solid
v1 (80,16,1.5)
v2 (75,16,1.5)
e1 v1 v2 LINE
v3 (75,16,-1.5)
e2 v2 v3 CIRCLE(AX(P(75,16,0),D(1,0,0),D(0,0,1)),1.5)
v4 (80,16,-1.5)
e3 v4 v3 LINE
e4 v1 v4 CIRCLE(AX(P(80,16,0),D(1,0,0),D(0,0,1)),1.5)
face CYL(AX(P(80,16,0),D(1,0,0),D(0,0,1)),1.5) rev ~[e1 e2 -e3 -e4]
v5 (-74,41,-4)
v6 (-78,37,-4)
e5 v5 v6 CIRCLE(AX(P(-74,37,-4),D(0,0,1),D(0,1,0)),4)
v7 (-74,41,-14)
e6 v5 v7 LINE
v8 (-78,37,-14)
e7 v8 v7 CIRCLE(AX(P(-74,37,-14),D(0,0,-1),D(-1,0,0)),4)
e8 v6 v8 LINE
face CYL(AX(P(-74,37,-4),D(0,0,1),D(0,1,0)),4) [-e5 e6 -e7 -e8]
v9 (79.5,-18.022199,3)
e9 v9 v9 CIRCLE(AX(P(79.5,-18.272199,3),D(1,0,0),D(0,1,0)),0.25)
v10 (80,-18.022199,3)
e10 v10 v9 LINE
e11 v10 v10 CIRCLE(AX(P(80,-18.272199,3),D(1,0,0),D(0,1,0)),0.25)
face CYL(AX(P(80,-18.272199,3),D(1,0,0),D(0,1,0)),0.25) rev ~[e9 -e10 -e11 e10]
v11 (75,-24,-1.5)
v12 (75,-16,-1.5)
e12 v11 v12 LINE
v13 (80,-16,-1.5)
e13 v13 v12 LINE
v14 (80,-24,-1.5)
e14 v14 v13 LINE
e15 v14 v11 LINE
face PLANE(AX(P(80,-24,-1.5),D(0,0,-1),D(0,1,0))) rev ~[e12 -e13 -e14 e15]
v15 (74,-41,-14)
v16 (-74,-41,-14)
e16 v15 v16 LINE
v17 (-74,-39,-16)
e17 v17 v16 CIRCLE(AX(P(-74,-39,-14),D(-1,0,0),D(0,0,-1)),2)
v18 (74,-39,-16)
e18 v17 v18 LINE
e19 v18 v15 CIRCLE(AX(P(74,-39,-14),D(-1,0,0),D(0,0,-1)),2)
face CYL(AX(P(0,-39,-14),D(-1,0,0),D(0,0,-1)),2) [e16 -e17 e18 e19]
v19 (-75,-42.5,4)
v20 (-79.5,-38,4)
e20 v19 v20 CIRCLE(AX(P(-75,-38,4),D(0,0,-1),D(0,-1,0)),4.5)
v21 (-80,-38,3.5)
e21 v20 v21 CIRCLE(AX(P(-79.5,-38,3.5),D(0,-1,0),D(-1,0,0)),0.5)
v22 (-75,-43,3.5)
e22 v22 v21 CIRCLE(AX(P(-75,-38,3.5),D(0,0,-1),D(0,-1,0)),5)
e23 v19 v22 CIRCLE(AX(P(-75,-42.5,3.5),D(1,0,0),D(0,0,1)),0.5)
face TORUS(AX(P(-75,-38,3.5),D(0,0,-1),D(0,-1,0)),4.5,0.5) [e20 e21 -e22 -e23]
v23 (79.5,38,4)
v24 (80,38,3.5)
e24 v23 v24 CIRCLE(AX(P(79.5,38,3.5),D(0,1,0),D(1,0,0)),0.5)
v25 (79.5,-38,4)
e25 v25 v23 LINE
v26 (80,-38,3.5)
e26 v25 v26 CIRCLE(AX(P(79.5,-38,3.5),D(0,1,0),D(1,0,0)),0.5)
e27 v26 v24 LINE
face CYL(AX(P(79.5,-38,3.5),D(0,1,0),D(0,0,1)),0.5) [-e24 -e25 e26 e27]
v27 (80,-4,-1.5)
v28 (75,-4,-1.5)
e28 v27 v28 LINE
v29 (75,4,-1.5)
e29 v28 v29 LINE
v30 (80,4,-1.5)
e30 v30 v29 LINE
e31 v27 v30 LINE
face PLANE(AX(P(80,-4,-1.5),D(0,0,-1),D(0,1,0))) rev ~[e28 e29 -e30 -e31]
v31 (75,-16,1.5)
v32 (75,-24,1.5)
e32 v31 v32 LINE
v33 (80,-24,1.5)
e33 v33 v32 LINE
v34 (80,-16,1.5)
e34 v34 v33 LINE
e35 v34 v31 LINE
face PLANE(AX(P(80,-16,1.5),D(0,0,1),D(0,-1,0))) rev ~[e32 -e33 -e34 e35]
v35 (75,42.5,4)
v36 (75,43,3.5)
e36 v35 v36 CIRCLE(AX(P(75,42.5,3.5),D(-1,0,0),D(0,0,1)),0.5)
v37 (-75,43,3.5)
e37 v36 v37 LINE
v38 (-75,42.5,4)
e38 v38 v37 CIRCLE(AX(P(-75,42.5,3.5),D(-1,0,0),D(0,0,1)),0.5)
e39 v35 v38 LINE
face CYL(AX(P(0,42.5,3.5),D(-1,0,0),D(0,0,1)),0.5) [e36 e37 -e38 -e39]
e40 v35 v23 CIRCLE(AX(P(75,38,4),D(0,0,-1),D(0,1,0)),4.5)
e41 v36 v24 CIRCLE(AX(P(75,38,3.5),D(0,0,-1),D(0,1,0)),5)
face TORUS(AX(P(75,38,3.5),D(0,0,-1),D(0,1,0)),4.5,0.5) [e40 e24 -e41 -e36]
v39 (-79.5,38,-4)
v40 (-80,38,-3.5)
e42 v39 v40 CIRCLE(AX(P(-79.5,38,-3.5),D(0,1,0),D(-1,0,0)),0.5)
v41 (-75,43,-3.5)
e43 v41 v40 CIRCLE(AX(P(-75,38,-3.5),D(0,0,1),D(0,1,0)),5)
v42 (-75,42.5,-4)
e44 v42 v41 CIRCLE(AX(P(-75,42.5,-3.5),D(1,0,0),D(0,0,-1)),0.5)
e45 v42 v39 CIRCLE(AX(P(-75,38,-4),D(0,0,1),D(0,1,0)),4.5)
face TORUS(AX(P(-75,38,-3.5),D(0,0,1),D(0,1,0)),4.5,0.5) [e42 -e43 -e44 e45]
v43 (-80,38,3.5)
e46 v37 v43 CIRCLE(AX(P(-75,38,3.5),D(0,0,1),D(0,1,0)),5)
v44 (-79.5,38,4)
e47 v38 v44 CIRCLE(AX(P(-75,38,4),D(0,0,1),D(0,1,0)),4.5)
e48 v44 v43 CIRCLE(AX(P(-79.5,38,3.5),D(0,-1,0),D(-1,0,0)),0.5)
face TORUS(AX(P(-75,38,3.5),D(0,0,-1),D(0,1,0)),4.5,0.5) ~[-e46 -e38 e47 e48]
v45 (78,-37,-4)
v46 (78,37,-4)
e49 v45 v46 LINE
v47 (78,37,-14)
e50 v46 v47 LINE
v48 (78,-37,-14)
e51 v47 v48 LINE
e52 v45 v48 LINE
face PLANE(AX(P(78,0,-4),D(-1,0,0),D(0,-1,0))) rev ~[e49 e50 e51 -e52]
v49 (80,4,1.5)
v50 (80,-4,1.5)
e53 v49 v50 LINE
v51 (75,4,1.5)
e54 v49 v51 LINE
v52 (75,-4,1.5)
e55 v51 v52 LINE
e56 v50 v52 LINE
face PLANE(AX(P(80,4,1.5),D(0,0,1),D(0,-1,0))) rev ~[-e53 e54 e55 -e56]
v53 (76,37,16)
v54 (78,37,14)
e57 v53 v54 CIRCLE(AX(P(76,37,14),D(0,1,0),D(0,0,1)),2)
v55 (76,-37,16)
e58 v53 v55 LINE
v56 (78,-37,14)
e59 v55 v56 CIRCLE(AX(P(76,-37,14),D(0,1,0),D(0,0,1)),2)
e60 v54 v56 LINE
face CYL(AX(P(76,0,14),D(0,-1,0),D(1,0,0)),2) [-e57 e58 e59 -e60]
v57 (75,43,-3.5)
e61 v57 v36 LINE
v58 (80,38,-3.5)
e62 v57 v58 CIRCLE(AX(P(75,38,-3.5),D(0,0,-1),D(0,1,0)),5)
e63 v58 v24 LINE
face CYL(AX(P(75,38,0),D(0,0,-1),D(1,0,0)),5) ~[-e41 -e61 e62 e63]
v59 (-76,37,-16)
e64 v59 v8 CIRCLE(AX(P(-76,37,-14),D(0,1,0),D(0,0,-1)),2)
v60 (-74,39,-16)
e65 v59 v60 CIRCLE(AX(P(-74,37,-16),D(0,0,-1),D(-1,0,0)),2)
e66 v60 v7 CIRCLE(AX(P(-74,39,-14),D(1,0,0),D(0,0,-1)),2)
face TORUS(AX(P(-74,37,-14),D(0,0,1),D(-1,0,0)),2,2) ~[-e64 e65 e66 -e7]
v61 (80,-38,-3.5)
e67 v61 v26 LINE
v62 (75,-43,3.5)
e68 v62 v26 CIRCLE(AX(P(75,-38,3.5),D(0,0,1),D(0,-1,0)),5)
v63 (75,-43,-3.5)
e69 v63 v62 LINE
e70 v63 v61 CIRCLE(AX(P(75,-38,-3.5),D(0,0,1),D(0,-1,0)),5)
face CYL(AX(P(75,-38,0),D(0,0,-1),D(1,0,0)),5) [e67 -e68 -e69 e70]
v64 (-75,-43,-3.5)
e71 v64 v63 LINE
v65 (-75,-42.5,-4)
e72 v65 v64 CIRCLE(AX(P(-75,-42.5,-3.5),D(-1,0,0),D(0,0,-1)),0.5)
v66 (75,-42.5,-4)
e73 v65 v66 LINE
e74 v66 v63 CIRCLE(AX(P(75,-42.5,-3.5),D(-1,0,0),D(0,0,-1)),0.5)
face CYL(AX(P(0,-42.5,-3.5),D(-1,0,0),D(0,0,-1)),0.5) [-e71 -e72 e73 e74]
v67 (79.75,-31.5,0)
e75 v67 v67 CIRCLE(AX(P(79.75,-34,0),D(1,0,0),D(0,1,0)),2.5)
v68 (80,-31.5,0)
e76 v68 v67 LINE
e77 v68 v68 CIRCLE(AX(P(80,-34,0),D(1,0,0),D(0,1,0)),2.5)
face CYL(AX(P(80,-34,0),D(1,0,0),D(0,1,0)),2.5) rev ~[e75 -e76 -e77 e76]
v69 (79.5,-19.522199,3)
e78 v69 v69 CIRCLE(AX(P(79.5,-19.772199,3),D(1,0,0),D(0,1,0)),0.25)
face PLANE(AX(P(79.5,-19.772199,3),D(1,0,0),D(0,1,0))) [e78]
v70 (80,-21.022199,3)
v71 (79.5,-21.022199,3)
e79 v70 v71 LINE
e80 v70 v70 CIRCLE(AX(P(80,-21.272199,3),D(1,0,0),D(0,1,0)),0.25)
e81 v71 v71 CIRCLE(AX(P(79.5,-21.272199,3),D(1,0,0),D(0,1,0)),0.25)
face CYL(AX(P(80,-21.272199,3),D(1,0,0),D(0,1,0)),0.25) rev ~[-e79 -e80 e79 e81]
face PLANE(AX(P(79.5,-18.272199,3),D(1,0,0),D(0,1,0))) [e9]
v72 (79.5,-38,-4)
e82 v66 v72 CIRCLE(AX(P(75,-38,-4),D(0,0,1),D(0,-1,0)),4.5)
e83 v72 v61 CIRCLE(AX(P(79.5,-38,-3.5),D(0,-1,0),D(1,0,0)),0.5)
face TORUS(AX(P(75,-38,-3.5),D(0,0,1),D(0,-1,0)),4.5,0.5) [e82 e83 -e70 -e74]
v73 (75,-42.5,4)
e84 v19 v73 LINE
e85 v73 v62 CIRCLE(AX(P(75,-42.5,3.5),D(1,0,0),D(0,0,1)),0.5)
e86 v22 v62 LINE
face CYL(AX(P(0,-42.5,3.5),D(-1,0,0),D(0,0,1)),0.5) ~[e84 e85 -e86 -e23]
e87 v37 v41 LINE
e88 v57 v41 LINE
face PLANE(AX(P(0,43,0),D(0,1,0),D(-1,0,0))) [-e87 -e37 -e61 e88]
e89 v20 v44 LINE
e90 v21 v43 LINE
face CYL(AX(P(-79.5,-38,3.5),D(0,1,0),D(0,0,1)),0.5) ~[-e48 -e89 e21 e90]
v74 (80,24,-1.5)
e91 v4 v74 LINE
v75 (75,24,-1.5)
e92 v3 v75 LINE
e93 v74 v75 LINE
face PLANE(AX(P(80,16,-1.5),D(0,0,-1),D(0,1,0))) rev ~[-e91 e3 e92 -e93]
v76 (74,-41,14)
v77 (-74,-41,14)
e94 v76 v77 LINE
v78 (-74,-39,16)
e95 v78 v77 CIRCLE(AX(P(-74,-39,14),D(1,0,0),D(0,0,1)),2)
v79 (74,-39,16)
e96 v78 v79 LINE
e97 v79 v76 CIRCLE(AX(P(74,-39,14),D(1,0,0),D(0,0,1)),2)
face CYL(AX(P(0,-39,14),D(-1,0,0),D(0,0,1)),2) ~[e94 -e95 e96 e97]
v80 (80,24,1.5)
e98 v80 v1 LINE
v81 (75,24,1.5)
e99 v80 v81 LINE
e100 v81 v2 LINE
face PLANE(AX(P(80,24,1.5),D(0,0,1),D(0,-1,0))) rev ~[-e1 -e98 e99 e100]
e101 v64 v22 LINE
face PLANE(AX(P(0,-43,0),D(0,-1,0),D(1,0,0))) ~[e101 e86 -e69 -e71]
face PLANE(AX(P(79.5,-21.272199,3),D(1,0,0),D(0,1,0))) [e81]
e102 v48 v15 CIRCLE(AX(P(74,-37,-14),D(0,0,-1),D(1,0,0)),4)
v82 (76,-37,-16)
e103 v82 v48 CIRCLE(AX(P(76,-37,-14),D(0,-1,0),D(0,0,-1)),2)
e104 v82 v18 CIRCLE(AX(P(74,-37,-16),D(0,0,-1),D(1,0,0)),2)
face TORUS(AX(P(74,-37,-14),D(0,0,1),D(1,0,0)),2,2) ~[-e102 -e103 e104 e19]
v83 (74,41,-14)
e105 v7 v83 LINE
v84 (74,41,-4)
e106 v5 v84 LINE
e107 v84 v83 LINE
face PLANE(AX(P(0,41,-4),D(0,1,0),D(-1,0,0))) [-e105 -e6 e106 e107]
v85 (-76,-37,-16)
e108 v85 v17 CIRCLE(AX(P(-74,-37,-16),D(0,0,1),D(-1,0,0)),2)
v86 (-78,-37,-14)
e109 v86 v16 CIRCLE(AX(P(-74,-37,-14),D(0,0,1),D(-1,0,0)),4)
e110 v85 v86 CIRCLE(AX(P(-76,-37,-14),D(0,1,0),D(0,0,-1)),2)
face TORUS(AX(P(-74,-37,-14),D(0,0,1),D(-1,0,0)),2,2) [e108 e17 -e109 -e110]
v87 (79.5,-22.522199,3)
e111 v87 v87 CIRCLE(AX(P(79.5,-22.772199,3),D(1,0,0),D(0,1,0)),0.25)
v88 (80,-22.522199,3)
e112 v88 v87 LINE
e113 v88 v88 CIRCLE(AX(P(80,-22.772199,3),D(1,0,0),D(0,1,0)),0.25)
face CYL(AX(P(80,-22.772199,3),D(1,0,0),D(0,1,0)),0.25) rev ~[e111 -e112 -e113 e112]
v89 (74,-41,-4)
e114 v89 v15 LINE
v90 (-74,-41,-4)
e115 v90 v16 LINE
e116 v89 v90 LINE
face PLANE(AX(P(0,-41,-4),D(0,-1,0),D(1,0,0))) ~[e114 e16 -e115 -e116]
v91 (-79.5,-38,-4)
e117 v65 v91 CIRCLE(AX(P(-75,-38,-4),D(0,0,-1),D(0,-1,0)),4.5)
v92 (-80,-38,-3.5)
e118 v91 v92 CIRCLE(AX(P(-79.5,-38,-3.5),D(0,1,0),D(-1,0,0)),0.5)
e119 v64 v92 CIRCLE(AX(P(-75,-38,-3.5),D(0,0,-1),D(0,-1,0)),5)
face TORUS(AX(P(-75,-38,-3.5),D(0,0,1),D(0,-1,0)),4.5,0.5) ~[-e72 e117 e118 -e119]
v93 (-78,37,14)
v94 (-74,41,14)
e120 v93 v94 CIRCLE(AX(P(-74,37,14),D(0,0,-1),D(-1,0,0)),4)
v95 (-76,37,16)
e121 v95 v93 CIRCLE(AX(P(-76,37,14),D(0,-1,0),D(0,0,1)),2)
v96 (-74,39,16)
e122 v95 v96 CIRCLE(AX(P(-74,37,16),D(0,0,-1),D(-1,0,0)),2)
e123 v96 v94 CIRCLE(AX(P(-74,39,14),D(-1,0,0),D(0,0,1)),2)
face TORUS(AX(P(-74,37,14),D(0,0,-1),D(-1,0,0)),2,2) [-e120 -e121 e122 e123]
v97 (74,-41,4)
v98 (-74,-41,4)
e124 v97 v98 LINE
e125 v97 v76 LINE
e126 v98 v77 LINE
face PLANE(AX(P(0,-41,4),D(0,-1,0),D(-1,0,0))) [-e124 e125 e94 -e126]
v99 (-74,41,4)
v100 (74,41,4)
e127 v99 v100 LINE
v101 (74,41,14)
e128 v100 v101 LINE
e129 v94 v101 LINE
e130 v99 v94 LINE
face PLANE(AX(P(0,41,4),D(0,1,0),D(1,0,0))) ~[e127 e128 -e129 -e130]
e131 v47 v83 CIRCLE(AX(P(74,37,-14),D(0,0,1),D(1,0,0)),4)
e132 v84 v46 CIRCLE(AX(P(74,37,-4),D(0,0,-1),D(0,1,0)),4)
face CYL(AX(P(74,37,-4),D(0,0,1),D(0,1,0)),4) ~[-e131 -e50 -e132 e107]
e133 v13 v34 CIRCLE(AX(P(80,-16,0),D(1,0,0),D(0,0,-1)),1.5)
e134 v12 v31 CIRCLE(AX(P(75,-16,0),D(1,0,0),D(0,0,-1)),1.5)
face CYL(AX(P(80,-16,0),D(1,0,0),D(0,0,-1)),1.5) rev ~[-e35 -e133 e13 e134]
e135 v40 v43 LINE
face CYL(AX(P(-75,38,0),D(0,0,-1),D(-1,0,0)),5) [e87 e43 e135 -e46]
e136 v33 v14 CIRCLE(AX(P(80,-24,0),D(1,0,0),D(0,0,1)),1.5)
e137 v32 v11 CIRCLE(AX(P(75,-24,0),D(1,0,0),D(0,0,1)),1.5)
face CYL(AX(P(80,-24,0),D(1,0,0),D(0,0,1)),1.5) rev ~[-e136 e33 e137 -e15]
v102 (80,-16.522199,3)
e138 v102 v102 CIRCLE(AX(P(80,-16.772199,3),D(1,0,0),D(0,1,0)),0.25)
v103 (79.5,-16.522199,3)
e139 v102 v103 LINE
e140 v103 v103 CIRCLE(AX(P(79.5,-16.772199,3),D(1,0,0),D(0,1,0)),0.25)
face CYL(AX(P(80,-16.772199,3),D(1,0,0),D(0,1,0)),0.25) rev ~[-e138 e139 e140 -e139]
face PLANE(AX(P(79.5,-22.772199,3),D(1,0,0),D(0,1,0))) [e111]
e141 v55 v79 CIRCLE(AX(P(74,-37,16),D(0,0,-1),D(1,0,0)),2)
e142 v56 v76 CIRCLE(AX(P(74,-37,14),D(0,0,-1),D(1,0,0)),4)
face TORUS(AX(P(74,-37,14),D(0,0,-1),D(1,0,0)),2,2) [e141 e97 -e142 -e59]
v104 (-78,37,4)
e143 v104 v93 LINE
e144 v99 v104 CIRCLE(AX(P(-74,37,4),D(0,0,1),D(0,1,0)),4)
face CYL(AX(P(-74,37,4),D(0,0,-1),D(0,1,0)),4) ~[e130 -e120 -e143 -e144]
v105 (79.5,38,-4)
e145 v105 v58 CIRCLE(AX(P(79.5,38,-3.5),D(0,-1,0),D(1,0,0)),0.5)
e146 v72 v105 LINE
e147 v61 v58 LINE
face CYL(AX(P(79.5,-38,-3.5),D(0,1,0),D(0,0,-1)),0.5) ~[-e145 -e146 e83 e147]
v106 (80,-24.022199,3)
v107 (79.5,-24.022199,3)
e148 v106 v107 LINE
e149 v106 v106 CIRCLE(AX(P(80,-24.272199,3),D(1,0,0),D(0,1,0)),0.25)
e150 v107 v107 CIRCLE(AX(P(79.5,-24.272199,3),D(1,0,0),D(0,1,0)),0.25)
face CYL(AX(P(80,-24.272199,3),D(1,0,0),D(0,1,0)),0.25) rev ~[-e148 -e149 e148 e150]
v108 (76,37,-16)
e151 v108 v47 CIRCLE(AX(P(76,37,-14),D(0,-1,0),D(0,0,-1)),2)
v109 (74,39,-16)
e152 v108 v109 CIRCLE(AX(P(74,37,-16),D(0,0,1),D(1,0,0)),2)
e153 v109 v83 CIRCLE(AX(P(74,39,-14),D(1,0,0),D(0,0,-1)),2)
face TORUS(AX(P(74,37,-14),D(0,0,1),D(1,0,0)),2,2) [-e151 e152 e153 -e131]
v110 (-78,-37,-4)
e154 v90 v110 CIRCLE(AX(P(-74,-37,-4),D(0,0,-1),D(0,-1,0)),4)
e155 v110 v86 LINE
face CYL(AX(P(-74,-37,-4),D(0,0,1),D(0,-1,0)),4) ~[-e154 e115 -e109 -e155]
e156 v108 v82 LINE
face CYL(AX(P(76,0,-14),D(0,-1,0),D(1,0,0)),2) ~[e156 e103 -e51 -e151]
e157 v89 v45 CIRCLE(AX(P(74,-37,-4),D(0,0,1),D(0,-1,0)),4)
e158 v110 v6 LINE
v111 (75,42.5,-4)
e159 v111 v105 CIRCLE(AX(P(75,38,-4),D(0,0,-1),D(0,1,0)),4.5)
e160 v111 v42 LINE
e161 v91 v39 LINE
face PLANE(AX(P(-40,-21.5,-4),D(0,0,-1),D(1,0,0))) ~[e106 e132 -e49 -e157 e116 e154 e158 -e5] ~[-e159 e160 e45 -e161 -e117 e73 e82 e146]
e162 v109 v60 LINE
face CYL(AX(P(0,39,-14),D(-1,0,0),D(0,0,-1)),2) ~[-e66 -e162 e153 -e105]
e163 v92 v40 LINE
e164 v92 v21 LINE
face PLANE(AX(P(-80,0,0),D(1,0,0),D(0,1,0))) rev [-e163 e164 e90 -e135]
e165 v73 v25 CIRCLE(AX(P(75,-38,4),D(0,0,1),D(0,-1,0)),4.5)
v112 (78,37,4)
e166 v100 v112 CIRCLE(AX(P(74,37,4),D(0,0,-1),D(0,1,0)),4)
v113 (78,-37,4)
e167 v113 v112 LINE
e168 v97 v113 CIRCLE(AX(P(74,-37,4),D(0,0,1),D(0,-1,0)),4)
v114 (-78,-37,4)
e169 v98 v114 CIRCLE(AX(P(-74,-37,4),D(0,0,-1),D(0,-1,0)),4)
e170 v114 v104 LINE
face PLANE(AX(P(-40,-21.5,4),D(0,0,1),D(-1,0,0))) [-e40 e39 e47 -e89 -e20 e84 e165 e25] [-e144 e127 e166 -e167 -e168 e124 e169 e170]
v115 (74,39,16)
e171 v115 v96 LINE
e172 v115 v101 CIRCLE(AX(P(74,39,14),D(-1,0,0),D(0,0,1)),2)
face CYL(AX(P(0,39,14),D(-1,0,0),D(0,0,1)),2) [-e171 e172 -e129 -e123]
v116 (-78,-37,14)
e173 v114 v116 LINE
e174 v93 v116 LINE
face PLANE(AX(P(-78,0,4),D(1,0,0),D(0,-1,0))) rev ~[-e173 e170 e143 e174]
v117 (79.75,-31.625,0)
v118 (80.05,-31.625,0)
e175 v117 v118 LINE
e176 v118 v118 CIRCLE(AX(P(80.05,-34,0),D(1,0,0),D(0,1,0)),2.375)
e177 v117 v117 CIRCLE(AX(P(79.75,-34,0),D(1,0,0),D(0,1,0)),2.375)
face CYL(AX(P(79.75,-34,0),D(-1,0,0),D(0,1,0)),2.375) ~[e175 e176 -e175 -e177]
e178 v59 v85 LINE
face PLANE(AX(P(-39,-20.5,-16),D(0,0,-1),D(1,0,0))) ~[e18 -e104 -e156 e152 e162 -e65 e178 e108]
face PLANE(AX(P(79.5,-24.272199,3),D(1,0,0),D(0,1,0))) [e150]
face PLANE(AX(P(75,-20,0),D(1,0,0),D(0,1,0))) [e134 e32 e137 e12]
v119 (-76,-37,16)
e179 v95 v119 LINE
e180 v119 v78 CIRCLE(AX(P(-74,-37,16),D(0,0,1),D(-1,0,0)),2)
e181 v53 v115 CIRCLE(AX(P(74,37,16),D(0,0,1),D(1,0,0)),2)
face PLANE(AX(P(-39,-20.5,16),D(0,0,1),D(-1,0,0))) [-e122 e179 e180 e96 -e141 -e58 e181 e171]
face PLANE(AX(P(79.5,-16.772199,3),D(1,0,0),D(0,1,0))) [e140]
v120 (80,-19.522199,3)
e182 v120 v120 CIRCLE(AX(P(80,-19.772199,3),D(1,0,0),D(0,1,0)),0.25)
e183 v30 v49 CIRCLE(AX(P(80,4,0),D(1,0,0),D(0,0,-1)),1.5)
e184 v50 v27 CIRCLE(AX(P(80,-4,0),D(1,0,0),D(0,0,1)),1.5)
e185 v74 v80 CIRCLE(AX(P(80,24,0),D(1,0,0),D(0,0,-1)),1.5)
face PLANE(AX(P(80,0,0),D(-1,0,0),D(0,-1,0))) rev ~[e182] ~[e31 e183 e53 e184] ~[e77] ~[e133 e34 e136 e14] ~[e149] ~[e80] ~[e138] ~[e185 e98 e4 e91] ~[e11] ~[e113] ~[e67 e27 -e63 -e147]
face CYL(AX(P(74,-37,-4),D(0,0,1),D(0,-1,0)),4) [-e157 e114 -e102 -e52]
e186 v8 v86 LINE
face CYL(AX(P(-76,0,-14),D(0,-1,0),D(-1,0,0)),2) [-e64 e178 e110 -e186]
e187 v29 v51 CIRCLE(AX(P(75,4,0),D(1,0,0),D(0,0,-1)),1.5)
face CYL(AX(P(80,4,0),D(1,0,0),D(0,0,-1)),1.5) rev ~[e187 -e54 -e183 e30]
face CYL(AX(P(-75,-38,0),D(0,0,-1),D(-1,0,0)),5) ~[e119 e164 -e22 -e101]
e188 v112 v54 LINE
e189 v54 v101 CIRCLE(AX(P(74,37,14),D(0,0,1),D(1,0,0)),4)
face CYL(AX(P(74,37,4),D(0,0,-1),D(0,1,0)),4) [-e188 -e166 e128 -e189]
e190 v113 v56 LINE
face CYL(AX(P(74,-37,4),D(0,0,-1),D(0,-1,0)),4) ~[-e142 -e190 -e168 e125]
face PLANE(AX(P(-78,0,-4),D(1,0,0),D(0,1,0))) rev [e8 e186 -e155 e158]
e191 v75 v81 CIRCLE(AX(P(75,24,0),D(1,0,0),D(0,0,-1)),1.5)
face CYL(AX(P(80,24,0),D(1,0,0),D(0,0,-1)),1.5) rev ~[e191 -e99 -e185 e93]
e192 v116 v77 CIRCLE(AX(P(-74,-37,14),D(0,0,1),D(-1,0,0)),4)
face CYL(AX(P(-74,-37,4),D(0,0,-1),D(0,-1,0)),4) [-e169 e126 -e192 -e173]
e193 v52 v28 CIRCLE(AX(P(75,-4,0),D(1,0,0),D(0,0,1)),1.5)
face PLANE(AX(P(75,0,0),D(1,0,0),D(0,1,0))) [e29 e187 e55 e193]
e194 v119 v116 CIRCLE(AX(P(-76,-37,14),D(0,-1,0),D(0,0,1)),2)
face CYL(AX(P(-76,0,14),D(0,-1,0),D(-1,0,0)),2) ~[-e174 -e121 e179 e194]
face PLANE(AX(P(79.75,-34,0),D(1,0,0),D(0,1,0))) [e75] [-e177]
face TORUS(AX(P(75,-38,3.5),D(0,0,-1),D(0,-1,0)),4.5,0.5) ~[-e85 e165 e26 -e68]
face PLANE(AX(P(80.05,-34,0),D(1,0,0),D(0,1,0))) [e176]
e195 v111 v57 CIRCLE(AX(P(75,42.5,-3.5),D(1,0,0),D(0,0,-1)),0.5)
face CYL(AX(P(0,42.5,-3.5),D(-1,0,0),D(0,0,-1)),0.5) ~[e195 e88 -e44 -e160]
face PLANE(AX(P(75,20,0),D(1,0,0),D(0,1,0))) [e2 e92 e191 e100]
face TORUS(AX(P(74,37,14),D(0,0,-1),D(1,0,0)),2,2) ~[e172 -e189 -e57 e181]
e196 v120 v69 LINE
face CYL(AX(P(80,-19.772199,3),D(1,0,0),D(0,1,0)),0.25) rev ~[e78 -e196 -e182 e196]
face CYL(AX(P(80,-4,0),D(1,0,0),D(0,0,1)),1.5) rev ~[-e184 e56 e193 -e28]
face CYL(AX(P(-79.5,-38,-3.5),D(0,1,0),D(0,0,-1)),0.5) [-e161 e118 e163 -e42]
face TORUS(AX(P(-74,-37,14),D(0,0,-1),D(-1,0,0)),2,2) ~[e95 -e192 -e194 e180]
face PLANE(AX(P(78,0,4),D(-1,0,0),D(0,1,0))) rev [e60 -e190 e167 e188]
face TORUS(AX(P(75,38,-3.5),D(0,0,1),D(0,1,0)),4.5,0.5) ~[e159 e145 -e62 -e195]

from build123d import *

# Parameters (mm, degrees)
F0_W        = 80
F0_H        = 43
F1_DEPTH    = 4
F2_W        = 78
F2_H        = 41
F3_DEPTH    = 12
F4_R        = 5
F5_R        = 0.5
F6_R        = 2
F7_T1_DEPTH = 12
F7_T4_ANGLE = 90
F11_R       = 2.5
F12_DEPTH   = 0.25
F13_DEPTH   = 5
F14_R       = 2.375
F15_DEPTH   = 0.3
F16_R       = 0.25
F17_DEPTH   = 0.5


# Not quite as in the source:
# - a fillet or chamfer that OpenCascade refuses, or shapes differently, is made with other operations: its cross-section is extruded or revolved along the edge and cut away or added


with BuildPart() as f1:
    # F0 (on Top) → F1 (new body)
    with BuildSketch(Plane.XY):
        with Locations((40, 21.5)):
            Rectangle(F0_W, F0_H)
    extrude(amount=F1_DEPTH)

    # F2 (on face) → F3 (join)
    with BuildSketch(Plane.XY.offset(4)):
        with Locations((39, 20.5)):
            Rectangle(F2_W, F2_H)
    extrude(amount=F3_DEPTH)

    # F4
    f4_edges = [f1.edges().sort_by_distance(p)[0] for p in [
        (80, 43, 2),
    ]]
    fillet(f4_edges, radius=F4_R)

    # F5
    f5_edges = [f1.edges().sort_by_distance(p)[0] for p in [
        (37.5, 43, 4),
        (78.535534, 41.535534, 4),
        (80, 19, 4),
    ]]
    fillet(f5_edges, radius=F5_R)

    # F6
    f6_edges = [f1.edges().sort_by_distance(p)[0] for p in [
        (78, 20.5, 16),
        (39, 41, 16),
    ]]
    fillet(f6_edges, radius=F6_R)

    # F7: fillet of radius 4 on 1 edges, made by hand

    # F7_s2 → F7_t1 (cut)
    with BuildSketch(Plane.XY.offset(4)):
        with BuildLine():
            ThreePointArc((74, 41), (76.8284271247, 39.8284271247), (78, 37))
            Line((78, 37), (78, 41))
            Line((78, 41), (74, 41))
        make_face()
    extrude(amount=F7_T1_DEPTH, mode=Mode.SUBTRACT)

    # F7_s3 → F7_t4 (revolve, cut)
    with BuildSketch(Plane.XZ.offset(-37)):
        with BuildLine():
            ThreePointArc((76, 16), (77.4142135624, 15.4142135624), (78, 14))
            Line((78, 14), (78, 16))
            Line((78, 16), (76, 16))
        make_face()
    revolve(axis=Axis((74, 37, 16), (0, 0, 1)), revolution_arc=F7_T4_ANGLE, mode=Mode.SUBTRACT)

    # F8: F1 across face


with BuildPart() as f1_1:
    add(f1.part)
    add(f1.part.mirror(Plane(origin=(39.2268461901, 0, 7.956765433), x_dir=(1, 0, 0), z_dir=(0, -1, 0))))

    # F9: F1 across face


with BuildPart() as f1_2:
    add(f1_1.part)
    add(f1_1.part.mirror(Plane(origin=(0, 0, 7.9181659321), x_dir=(0, -1, 0), z_dir=(-1, 0, 0))))

    # F10: F1 across face


with BuildPart() as f1_3:
    add(f1_2.part)
    add(f1_2.part.mirror(Plane(origin=(0, 0, 0), x_dir=(1, 0, 0), z_dir=(0, 0, -1))))

    # F11 (on face) → F12 (cut)
    with BuildSketch(Plane.YZ.offset(80)):
        with Locations((-34, 0)):
            Circle(F11_R)
    extrude(amount=-F12_DEPTH, mode=Mode.SUBTRACT)

    # F11 (on face) → F13 (cut)
    with BuildSketch(Plane.YZ.offset(80)):
        with BuildLine():
            Line((-24, -1.5), (-16, -1.5))
            ThreePointArc((-16, -1.5), (-14.5, 0), (-16, 1.5))
            Line((-16, 1.5), (-24, 1.5))
            ThreePointArc((-24, 1.5), (-25.5, 0), (-24, -1.5))
        make_face()
        with BuildLine():
            Line((-4, -1.5), (4, -1.5))
            ThreePointArc((4, -1.5), (5.5, 0), (4, 1.5))
            Line((4, 1.5), (-4, 1.5))
            ThreePointArc((-4, 1.5), (-5.5, 0), (-4, -1.5))
        make_face()
        with BuildLine():
            Line((16, -1.5), (24, -1.5))
            ThreePointArc((24, -1.5), (25.5, 0), (24, 1.5))
            Line((24, 1.5), (16, 1.5))
            ThreePointArc((16, 1.5), (14.5, 0), (16, -1.5))
        make_face()
    extrude(amount=-F13_DEPTH, mode=Mode.SUBTRACT)

    # F14 (on face) → F15 (join)
    with BuildSketch(Plane.YZ.offset(79.75)):
        with Locations((-34, 0)):
            Circle(F14_R)
    extrude(amount=F15_DEPTH)

    # F16 (on face) → F17 (cut)
    with BuildSketch(Plane.YZ.offset(80)):
        with Locations((-21.2721988683, 3)):
            Circle(F16_R)
        with Locations((-18.2721988683, 3)):
            Circle(F16_R)
        with Locations((-16.7721988683, 3)):
            Circle(F16_R)
        with Locations((-22.7721988683, 3)):
            Circle(F16_R)
        with Locations((-24.2721988683, 3)):
            Circle(F16_R)
        with Locations((-19.7721988683, 3)):
            Circle(F16_R)
    extrude(amount=-F17_DEPTH, mode=Mode.SUBTRACT)


solid = f1_3.part
